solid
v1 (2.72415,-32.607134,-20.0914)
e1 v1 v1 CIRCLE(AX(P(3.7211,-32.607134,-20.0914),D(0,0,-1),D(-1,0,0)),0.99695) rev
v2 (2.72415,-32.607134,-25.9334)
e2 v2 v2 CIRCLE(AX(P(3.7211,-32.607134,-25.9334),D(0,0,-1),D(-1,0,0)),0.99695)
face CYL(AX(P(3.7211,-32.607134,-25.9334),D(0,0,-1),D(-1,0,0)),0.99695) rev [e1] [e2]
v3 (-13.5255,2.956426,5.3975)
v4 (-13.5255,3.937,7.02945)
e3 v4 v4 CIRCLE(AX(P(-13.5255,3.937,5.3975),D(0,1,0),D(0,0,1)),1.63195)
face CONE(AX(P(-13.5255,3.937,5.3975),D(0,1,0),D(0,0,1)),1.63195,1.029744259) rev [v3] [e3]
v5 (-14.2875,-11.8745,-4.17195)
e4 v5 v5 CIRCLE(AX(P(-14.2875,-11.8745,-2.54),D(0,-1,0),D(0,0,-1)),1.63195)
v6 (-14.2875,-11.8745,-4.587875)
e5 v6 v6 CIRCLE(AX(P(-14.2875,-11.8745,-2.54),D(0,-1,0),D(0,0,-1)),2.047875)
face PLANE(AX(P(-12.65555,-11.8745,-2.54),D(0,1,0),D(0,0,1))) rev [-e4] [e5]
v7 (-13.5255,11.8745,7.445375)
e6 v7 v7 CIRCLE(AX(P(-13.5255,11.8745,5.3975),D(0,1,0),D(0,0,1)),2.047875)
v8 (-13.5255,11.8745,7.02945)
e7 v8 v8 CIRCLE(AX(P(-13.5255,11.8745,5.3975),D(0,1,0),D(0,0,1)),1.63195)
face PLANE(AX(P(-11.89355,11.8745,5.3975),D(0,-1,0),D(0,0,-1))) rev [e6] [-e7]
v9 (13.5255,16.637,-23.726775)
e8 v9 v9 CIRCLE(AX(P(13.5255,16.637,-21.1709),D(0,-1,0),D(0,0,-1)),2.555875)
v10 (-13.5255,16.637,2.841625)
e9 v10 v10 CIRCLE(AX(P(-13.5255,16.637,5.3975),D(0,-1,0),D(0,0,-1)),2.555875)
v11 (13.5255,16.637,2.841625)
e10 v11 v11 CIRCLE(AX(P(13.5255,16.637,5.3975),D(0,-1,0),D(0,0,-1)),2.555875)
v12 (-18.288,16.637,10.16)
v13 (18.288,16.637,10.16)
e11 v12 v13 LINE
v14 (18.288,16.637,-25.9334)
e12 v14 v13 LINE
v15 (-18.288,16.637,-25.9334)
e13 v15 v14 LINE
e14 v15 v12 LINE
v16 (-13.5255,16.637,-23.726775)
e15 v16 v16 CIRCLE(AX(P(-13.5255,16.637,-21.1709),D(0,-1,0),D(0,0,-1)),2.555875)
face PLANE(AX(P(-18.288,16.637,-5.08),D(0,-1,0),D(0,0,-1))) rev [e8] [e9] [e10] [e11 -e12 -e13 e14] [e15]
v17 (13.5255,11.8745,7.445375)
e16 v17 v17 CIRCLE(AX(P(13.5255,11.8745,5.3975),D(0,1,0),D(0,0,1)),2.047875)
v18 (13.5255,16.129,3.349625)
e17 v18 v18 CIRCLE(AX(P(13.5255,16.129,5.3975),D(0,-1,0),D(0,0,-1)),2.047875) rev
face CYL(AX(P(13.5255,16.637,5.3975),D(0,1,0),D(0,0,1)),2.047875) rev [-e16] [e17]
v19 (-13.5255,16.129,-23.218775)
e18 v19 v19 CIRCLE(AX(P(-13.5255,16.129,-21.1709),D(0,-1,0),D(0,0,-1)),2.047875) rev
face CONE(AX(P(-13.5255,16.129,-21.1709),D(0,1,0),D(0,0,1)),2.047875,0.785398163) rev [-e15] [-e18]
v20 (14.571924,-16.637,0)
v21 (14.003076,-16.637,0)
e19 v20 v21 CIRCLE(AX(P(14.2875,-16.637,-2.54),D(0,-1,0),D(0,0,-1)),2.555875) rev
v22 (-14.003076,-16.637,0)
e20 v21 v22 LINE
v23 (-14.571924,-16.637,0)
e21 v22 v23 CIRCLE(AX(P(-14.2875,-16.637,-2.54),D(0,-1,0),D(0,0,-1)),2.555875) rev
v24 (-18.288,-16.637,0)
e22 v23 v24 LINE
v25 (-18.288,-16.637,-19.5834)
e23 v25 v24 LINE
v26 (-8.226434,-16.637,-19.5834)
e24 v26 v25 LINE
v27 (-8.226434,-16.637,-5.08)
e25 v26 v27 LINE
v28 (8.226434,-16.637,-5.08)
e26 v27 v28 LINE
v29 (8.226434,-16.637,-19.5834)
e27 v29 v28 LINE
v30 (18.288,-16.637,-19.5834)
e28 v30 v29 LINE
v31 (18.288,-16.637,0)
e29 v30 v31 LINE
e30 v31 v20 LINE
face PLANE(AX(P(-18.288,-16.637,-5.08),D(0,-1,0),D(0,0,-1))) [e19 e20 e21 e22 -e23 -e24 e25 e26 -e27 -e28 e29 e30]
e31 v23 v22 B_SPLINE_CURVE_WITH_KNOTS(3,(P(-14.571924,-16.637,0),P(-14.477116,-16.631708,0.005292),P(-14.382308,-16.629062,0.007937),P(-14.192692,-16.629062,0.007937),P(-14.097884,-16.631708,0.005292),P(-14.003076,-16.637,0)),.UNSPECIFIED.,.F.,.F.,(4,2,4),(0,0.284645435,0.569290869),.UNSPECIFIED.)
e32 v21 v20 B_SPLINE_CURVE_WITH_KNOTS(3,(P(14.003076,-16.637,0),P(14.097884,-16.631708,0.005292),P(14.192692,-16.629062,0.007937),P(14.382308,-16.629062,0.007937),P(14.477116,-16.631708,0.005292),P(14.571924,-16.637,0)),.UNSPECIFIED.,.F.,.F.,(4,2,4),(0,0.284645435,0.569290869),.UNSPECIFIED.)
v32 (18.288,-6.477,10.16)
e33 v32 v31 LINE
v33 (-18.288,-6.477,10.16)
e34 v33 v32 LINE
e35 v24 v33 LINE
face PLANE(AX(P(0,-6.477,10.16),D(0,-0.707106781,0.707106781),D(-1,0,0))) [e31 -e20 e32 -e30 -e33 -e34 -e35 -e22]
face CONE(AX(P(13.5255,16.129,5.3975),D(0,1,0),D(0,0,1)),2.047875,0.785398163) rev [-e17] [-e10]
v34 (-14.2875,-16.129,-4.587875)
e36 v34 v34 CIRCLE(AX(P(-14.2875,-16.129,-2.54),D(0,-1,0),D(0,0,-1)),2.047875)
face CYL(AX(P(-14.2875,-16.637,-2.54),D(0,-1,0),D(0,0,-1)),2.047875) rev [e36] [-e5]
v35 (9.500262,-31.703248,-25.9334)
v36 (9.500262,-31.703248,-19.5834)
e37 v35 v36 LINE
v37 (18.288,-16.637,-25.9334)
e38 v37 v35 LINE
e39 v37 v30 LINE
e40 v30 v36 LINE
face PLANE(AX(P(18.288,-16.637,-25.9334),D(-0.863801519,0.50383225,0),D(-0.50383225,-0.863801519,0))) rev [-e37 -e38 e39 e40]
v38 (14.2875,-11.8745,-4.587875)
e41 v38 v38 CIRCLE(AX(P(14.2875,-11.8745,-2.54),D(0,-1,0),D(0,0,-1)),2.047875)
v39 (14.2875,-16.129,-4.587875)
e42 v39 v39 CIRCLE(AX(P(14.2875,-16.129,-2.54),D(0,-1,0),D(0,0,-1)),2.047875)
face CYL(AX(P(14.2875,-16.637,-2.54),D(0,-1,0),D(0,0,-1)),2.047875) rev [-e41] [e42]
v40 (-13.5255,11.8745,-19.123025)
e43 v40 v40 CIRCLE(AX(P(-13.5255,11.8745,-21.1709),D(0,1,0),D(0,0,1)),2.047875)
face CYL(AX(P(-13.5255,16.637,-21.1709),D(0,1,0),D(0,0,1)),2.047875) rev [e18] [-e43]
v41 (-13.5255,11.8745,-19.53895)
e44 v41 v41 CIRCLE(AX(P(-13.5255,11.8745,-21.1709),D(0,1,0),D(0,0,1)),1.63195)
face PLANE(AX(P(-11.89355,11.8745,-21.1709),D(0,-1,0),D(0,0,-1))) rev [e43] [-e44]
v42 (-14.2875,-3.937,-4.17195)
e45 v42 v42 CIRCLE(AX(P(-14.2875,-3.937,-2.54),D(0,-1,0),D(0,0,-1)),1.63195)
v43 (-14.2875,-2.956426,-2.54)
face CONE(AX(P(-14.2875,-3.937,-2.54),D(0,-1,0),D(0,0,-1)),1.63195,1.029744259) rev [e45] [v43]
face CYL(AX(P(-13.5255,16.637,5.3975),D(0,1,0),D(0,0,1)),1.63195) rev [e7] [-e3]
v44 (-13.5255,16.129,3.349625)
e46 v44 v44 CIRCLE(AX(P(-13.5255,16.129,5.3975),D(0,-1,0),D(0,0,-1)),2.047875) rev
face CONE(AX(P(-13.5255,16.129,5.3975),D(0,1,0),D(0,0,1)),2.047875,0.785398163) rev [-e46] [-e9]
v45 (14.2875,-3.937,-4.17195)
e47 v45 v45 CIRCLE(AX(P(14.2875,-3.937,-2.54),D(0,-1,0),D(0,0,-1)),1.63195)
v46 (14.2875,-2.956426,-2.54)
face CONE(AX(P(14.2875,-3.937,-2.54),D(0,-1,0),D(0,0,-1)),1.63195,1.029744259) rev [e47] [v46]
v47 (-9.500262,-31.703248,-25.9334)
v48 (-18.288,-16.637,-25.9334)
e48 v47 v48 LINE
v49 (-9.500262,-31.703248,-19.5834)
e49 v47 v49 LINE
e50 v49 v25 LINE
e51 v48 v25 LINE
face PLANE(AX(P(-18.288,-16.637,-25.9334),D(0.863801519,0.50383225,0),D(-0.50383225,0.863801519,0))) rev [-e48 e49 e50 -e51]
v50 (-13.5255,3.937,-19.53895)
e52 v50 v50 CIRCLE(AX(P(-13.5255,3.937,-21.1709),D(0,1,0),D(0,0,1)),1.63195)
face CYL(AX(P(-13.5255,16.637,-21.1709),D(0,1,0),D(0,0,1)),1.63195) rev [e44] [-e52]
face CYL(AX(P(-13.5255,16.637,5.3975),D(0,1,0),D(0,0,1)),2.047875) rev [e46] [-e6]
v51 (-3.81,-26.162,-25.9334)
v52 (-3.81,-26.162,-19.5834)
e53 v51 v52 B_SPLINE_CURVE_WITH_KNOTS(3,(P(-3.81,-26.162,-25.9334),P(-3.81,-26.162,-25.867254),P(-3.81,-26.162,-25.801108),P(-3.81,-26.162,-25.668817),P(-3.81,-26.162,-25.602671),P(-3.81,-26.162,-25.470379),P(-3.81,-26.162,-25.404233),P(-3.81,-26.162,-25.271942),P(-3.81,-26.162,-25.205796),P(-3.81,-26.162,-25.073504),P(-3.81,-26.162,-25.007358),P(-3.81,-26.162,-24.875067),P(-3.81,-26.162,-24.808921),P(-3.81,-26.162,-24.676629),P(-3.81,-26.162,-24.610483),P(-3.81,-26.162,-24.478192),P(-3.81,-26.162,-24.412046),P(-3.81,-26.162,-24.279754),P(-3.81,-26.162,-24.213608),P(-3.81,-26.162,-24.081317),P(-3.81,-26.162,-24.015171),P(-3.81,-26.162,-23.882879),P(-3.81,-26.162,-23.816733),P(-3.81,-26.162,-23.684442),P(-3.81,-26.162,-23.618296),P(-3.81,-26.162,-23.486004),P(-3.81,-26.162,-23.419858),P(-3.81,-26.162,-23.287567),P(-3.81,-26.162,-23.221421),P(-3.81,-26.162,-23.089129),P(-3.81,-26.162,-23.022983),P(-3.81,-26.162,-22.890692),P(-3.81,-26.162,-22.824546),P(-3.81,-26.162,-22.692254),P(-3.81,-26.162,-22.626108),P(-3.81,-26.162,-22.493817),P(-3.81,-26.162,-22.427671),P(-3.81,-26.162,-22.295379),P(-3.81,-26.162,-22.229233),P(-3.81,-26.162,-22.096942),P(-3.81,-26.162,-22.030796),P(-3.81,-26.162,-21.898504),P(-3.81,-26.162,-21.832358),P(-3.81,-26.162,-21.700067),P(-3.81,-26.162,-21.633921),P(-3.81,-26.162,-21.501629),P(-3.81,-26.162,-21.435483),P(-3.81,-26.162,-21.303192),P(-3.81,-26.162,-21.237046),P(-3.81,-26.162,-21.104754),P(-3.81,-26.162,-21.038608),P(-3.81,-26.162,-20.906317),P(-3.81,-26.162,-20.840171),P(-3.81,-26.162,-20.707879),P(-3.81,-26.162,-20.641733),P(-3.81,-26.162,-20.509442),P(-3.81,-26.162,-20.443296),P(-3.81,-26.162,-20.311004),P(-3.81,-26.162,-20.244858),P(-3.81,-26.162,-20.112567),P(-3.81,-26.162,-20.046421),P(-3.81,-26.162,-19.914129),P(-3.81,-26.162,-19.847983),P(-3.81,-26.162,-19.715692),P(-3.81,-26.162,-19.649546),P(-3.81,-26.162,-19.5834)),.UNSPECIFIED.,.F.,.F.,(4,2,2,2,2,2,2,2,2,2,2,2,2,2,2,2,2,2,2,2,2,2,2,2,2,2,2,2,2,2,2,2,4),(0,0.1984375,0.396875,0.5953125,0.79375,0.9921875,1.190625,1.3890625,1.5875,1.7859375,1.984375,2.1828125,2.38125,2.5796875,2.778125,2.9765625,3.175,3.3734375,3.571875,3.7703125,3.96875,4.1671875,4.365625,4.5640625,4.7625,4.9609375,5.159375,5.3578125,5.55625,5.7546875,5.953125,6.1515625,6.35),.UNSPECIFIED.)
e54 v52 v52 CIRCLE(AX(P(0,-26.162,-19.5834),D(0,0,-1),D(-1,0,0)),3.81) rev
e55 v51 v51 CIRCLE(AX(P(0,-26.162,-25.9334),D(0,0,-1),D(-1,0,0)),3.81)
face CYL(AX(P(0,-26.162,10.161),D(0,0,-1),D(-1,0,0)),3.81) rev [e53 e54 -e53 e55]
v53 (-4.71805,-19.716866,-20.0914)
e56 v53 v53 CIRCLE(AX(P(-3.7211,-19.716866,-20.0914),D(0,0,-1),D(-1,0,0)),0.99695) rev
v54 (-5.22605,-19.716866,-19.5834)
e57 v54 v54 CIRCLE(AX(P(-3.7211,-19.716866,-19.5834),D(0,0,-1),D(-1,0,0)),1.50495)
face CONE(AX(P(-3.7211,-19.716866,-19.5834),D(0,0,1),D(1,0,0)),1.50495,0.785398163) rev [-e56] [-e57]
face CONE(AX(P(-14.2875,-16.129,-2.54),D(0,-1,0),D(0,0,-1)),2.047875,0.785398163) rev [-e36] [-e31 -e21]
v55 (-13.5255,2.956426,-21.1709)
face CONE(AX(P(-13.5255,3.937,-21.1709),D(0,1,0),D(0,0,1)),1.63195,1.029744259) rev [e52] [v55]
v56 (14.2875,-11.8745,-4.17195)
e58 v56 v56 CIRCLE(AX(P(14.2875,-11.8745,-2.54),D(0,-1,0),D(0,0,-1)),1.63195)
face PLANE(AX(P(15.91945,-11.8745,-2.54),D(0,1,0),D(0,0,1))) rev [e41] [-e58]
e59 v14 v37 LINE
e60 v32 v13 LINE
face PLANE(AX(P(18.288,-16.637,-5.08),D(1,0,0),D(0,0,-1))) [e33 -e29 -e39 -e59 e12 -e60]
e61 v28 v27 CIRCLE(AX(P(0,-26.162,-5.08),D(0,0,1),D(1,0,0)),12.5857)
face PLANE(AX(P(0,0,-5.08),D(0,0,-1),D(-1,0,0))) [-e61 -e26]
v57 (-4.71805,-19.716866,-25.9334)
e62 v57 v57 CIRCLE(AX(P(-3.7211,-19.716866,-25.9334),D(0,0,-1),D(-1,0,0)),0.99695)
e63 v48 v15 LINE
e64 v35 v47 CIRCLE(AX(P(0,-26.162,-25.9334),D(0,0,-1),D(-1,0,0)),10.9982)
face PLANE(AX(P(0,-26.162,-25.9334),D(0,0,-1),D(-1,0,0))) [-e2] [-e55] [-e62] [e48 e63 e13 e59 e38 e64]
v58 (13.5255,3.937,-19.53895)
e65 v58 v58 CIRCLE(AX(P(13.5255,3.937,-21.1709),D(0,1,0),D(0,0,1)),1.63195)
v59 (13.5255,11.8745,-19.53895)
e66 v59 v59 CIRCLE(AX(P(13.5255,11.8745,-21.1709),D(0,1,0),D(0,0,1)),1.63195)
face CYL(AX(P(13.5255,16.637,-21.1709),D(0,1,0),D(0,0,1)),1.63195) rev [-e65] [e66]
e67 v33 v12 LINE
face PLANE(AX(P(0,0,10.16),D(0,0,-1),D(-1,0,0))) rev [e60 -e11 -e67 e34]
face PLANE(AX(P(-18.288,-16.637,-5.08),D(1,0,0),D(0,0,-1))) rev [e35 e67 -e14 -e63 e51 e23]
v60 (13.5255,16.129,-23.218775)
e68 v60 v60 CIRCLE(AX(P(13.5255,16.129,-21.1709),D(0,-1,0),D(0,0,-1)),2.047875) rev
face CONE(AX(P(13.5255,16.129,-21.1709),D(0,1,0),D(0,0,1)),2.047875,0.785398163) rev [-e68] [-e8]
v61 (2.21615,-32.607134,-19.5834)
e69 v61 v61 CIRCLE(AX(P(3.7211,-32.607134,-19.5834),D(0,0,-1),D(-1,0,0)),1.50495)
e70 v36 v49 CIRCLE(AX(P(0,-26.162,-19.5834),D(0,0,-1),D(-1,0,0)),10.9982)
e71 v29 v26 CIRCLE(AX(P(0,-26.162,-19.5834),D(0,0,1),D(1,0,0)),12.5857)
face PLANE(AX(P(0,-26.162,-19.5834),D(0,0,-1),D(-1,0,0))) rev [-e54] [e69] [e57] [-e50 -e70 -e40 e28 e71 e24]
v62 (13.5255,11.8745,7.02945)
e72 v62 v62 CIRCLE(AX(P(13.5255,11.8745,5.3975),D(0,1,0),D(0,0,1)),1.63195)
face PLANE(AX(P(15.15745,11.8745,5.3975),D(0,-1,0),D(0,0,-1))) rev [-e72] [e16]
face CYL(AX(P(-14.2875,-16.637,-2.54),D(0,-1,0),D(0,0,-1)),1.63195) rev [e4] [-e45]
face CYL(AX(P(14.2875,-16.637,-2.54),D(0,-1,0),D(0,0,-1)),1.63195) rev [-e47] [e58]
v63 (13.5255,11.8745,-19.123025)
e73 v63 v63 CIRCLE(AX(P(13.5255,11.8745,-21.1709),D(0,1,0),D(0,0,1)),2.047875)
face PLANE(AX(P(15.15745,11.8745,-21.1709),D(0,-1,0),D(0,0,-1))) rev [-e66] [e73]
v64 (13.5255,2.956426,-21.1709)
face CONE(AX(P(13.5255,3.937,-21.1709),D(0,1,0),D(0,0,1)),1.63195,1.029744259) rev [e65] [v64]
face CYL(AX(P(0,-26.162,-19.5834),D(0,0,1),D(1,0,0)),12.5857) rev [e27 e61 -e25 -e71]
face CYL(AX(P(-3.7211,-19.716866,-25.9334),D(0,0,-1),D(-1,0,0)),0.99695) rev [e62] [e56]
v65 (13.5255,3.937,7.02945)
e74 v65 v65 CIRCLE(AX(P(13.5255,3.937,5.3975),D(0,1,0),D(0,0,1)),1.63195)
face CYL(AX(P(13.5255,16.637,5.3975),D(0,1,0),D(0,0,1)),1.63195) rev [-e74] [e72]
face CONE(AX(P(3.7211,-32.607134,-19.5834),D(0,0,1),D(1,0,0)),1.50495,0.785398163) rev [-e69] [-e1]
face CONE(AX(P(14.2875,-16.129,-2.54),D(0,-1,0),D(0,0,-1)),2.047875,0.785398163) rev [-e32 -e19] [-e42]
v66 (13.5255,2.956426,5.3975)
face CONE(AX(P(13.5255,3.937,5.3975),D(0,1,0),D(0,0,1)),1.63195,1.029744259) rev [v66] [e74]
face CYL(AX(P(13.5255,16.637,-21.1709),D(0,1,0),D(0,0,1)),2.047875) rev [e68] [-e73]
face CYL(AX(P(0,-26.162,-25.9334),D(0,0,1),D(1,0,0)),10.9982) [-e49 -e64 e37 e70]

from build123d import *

# Parameters (mm, degrees)
BEARING_MOUNT_BLOCK_DEPTH                      = 10.16
BEARING_MOUNT_BLOCK_DEPTH_BACK                 = 5.08
SKETCH1_W                                      = 36.576
SKETCH1_H                                      = 33.274
ENCODER_EXTENSION_DEPTH                        = 14.5034
ENCODER_MOUNT_PLATE_DEPTH                      = 6.35
SHAFT_CLEARANCE_HOLE_REACH                     = 56.937
SKETCH6_R                                      = 3.81
F_3_48_TAPPED_HOLES_D                          = 1.9939
CBORE_FOR_4_SOCKET_HEAD_CAP_SCREW1_D           = 3.2639
CBORE_FOR_4_SOCKET_HEAD_CAP_SCREW1_DEPTH       = 12.7
CBORE_FOR_4_SOCKET_HEAD_CAP_SCREW1_CBORE_D     = 4.09575
CBORE_FOR_4_SOCKET_HEAD_CAP_SCREW1_CBORE_DEPTH = 4.7625
CBORE_FOR_4_SOCKET_HEAD_CAP_SCREW1_TIP         = 0.980574487
CBORE_FOR_4_SOCKET_HEAD_CAP_SCREW2_D           = 3.2639
CBORE_FOR_4_SOCKET_HEAD_CAP_SCREW2_DEPTH       = 12.7
CBORE_FOR_4_SOCKET_HEAD_CAP_SCREW2_CBORE_D     = 4.09575
CBORE_FOR_4_SOCKET_HEAD_CAP_SCREW2_CBORE_DEPTH = 4.7625
CBORE_FOR_4_SOCKET_HEAD_CAP_SCREW2_TIP         = 0.980574487
MATERIAL_REDUCTION_CHAMFER_SIZE                = 10.16
CHAMFER1_SIZE                                  = 0.508


with BuildPart() as part:
    # Sketch1 → Bearing Mount Block (new, two sides: drawn at the far end of the back side and taken through both)
    with BuildSketch(Plane.XY.offset(-BEARING_MOUNT_BLOCK_DEPTH_BACK)):
        Rectangle(SKETCH1_W, SKETCH1_H)
    extrude(amount=BEARING_MOUNT_BLOCK_DEPTH + BEARING_MOUNT_BLOCK_DEPTH_BACK)

    # Sketch3 → Encoder Extension (add)
    with BuildSketch(Plane(origin=(0, 0, -5.08), x_dir=(-1, 0, 0), z_dir=(0, 0, -1))):
        with BuildLine():
            Line((18.288, 16.637), (-18.288, 16.637))
            Line((-18.288, 16.637), (-18.288, -16.637))
            Line((-18.288, -16.637), (-8.22643419, -16.637))
            ThreePointArc((-8.22643419, -16.637), (0, -13.5763), (8.22643419, -16.637))
            Line((8.22643419, -16.637), (18.288, -16.637))
            Line((18.288, -16.637), (18.288, 16.637))
        make_face()
    extrude(amount=ENCODER_EXTENSION_DEPTH)

    # Sketch4 → Encoder Mount Plate (add)
    with BuildSketch(Plane(origin=(0, 0, -19.5834), x_dir=(-1, 0, 0), z_dir=(0, 0, -1))):
        with BuildLine():
            Line((18.288, 16.637), (-18.288, 16.637))
            Line((-18.288, 16.637), (-18.288, -16.637))
            Line((-18.288, -16.637), (-9.500261866, -31.703247849))
            ThreePointArc((-9.500261866, -31.703247849), (0, -37.1602), (9.500261866, -31.703247849))
            Line((9.500261866, -31.703247849), (18.288, -16.637))
            Line((18.288, -16.637), (18.288, 16.637))
        make_face()
    extrude(amount=ENCODER_MOUNT_PLATE_DEPTH)

    # Sketch6 → Shaft Clearance Hole (cut, up to next)
    with BuildSketch(Plane(origin=(0, 0, -25.9334), x_dir=(-1, 0, 0), z_dir=(0, 0, -1)), mode=Mode.PRIVATE) as shaft_clearance_hole_sk1:
        with Locations((0, -26.162)):
            Circle(SKETCH6_R)
    shaft_clearance_hole_tool1 = extrude(shaft_clearance_hole_sk1.sketch, amount=-SHAFT_CLEARANCE_HOLE_REACH, mode=Mode.PRIVATE) & part.part
    add(shaft_clearance_hole_tool1.solids().sort_by_distance((0, -26.162, -25.9334))[0], mode=Mode.SUBTRACT)

    # #3-48 Tapped Holes (through all)
    with Locations(Plane(origin=(-3.7211, -19.71686574, -25.9334), x_dir=(-1, 0, 0), z_dir=(0, 0, -1))):
        with Locations((0, 0), (-7.4422, -12.89026852)):
            Hole(F_3_48_TAPPED_HOLES_D / 2)

    # CBORE for #4 Socket Head Cap Screw1
    with Locations(Plane(origin=(-14.2875, -16.637, -2.54), x_dir=(0, 0, -1), z_dir=(0, -1, 0))):
        with Locations((0, 0), (0, 28.575)):
            CounterBoreHole(CBORE_FOR_4_SOCKET_HEAD_CAP_SCREW1_D / 2, CBORE_FOR_4_SOCKET_HEAD_CAP_SCREW1_CBORE_D / 2, CBORE_FOR_4_SOCKET_HEAD_CAP_SCREW1_CBORE_DEPTH, depth=CBORE_FOR_4_SOCKET_HEAD_CAP_SCREW1_DEPTH)
            with Locations((0, 0, -(CBORE_FOR_4_SOCKET_HEAD_CAP_SCREW1_DEPTH + CBORE_FOR_4_SOCKET_HEAD_CAP_SCREW1_TIP / 2))):  # 118° drill point
                Cone(0, CBORE_FOR_4_SOCKET_HEAD_CAP_SCREW1_D / 2, CBORE_FOR_4_SOCKET_HEAD_CAP_SCREW1_TIP, mode=Mode.SUBTRACT)

    # CBORE for #4 Socket Head Cap Screw2
    with Locations(Plane(origin=(0, 16.637, 0), x_dir=(1, 0, 0), z_dir=(0, 1, 0))):
        with Locations((-13.5255, 21.1709), (13.5255, 21.1709), (13.5255, -5.3975), (-13.5255, -5.3975)):
            CounterBoreHole(CBORE_FOR_4_SOCKET_HEAD_CAP_SCREW2_D / 2, CBORE_FOR_4_SOCKET_HEAD_CAP_SCREW2_CBORE_D / 2, CBORE_FOR_4_SOCKET_HEAD_CAP_SCREW2_CBORE_DEPTH, depth=CBORE_FOR_4_SOCKET_HEAD_CAP_SCREW2_DEPTH)
            with Locations((0, 0, -(CBORE_FOR_4_SOCKET_HEAD_CAP_SCREW2_DEPTH + CBORE_FOR_4_SOCKET_HEAD_CAP_SCREW2_TIP / 2))):  # 118° drill point
                Cone(0, CBORE_FOR_4_SOCKET_HEAD_CAP_SCREW2_D / 2, CBORE_FOR_4_SOCKET_HEAD_CAP_SCREW2_TIP, mode=Mode.SUBTRACT)

    # Material Reduction Chamfer
    material_reduction_chamfer_edges = [part.edges().sort_by_distance(p)[0] for p in [
        (0, -16.637, 10.16),
    ]]
    chamfer(material_reduction_chamfer_edges, length=MATERIAL_REDUCTION_CHAMFER_SIZE)

    # Chamfer1
    # the kernel refuses this chamfer: 0.508 mm, written as the material it takes off along each edge
    with BuildSketch(Plane(origin=(13.5255, 16.637, -21.1709), x_dir=(1, 0, 0), z_dir=(0, 0, 1))) as chamfer1_piece_1:
        Polygon((2.047875 + CHAMFER1_SIZE, 0), (2.047875, -CHAMFER1_SIZE), (2.047875, 0), align=None)
    revolve(axis=Axis((13.5255, 16.637, -21.1709), (0, 1, 0)), mode=Mode.SUBTRACT)
    with BuildSketch(Plane(origin=(-13.5255, 16.637, -21.1709), x_dir=(1, 0, 0), z_dir=(0, 0, 1))) as chamfer1_piece_2:
        Polygon((2.047875 + CHAMFER1_SIZE, 0), (2.047875, -CHAMFER1_SIZE), (2.047875, 0), align=None)
    revolve(axis=Axis((-13.5255, 16.637, -21.1709), (0, 1, 0)), mode=Mode.SUBTRACT)
    with BuildSketch(Plane(origin=(3.7211, -32.60713426, -19.5834), x_dir=(1, 0, 0), z_dir=(0, -1, 0))) as chamfer1_piece_3:
        Polygon((0.99695 + CHAMFER1_SIZE, 0), (0.99695, -CHAMFER1_SIZE), (0.99695, 0), align=None)
    revolve(axis=Axis((3.7211, -32.60713426, -19.5834), (0, 0, 1)), mode=Mode.SUBTRACT)
    with BuildSketch(Plane(origin=(-3.7211, -19.71686574, -19.5834), x_dir=(1, 0, 0), z_dir=(0, -1, 0))) as chamfer1_piece_4:
        Polygon((0.99695 + CHAMFER1_SIZE, 0), (0.99695, -CHAMFER1_SIZE), (0.99695, 0), align=None)
    revolve(axis=Axis((-3.7211, -19.71686574, -19.5834), (0, 0, 1)), mode=Mode.SUBTRACT)
    with BuildSketch(Plane(origin=(14.2875, -16.637, -2.54), x_dir=(0, 0, -1), z_dir=(-1, 0, 0))) as chamfer1_piece_5:
        Polygon((2.047875 + CHAMFER1_SIZE, 0), (2.047875, -CHAMFER1_SIZE), (2.047875, 0), align=None)
    revolve(axis=Axis((14.2875, -16.637, -2.54), (0, -1, 0)), mode=Mode.SUBTRACT)
    with BuildSketch(Plane(origin=(-14.2875, -16.637, -2.54), x_dir=(0, 0, -1), z_dir=(-1, 0, 0))) as chamfer1_piece_6:
        Polygon((2.047875 + CHAMFER1_SIZE, 0), (2.047875, -CHAMFER1_SIZE), (2.047875, 0), align=None)
    revolve(axis=Axis((-14.2875, -16.637, -2.54), (0, -1, 0)), mode=Mode.SUBTRACT)
    with BuildSketch(Plane(origin=(-13.5255, 16.637, 5.3975), x_dir=(1, 0, 0), z_dir=(0, 0, 1))) as chamfer1_piece_7:
        Polygon((2.047875 + CHAMFER1_SIZE, 0), (2.047875, -CHAMFER1_SIZE), (2.047875, 0), align=None)
    revolve(axis=Axis((-13.5255, 16.637, 5.3975), (0, 1, 0)), mode=Mode.SUBTRACT)
    with BuildSketch(Plane(origin=(13.5255, 16.637, 5.3975), x_dir=(1, 0, 0), z_dir=(0, 0, 1))) as chamfer1_piece_8:
        Polygon((2.047875 + CHAMFER1_SIZE, 0), (2.047875, -CHAMFER1_SIZE), (2.047875, 0), align=None)
    revolve(axis=Axis((13.5255, 16.637, 5.3975), (0, 1, 0)), mode=Mode.SUBTRACT)


solid = part.part
